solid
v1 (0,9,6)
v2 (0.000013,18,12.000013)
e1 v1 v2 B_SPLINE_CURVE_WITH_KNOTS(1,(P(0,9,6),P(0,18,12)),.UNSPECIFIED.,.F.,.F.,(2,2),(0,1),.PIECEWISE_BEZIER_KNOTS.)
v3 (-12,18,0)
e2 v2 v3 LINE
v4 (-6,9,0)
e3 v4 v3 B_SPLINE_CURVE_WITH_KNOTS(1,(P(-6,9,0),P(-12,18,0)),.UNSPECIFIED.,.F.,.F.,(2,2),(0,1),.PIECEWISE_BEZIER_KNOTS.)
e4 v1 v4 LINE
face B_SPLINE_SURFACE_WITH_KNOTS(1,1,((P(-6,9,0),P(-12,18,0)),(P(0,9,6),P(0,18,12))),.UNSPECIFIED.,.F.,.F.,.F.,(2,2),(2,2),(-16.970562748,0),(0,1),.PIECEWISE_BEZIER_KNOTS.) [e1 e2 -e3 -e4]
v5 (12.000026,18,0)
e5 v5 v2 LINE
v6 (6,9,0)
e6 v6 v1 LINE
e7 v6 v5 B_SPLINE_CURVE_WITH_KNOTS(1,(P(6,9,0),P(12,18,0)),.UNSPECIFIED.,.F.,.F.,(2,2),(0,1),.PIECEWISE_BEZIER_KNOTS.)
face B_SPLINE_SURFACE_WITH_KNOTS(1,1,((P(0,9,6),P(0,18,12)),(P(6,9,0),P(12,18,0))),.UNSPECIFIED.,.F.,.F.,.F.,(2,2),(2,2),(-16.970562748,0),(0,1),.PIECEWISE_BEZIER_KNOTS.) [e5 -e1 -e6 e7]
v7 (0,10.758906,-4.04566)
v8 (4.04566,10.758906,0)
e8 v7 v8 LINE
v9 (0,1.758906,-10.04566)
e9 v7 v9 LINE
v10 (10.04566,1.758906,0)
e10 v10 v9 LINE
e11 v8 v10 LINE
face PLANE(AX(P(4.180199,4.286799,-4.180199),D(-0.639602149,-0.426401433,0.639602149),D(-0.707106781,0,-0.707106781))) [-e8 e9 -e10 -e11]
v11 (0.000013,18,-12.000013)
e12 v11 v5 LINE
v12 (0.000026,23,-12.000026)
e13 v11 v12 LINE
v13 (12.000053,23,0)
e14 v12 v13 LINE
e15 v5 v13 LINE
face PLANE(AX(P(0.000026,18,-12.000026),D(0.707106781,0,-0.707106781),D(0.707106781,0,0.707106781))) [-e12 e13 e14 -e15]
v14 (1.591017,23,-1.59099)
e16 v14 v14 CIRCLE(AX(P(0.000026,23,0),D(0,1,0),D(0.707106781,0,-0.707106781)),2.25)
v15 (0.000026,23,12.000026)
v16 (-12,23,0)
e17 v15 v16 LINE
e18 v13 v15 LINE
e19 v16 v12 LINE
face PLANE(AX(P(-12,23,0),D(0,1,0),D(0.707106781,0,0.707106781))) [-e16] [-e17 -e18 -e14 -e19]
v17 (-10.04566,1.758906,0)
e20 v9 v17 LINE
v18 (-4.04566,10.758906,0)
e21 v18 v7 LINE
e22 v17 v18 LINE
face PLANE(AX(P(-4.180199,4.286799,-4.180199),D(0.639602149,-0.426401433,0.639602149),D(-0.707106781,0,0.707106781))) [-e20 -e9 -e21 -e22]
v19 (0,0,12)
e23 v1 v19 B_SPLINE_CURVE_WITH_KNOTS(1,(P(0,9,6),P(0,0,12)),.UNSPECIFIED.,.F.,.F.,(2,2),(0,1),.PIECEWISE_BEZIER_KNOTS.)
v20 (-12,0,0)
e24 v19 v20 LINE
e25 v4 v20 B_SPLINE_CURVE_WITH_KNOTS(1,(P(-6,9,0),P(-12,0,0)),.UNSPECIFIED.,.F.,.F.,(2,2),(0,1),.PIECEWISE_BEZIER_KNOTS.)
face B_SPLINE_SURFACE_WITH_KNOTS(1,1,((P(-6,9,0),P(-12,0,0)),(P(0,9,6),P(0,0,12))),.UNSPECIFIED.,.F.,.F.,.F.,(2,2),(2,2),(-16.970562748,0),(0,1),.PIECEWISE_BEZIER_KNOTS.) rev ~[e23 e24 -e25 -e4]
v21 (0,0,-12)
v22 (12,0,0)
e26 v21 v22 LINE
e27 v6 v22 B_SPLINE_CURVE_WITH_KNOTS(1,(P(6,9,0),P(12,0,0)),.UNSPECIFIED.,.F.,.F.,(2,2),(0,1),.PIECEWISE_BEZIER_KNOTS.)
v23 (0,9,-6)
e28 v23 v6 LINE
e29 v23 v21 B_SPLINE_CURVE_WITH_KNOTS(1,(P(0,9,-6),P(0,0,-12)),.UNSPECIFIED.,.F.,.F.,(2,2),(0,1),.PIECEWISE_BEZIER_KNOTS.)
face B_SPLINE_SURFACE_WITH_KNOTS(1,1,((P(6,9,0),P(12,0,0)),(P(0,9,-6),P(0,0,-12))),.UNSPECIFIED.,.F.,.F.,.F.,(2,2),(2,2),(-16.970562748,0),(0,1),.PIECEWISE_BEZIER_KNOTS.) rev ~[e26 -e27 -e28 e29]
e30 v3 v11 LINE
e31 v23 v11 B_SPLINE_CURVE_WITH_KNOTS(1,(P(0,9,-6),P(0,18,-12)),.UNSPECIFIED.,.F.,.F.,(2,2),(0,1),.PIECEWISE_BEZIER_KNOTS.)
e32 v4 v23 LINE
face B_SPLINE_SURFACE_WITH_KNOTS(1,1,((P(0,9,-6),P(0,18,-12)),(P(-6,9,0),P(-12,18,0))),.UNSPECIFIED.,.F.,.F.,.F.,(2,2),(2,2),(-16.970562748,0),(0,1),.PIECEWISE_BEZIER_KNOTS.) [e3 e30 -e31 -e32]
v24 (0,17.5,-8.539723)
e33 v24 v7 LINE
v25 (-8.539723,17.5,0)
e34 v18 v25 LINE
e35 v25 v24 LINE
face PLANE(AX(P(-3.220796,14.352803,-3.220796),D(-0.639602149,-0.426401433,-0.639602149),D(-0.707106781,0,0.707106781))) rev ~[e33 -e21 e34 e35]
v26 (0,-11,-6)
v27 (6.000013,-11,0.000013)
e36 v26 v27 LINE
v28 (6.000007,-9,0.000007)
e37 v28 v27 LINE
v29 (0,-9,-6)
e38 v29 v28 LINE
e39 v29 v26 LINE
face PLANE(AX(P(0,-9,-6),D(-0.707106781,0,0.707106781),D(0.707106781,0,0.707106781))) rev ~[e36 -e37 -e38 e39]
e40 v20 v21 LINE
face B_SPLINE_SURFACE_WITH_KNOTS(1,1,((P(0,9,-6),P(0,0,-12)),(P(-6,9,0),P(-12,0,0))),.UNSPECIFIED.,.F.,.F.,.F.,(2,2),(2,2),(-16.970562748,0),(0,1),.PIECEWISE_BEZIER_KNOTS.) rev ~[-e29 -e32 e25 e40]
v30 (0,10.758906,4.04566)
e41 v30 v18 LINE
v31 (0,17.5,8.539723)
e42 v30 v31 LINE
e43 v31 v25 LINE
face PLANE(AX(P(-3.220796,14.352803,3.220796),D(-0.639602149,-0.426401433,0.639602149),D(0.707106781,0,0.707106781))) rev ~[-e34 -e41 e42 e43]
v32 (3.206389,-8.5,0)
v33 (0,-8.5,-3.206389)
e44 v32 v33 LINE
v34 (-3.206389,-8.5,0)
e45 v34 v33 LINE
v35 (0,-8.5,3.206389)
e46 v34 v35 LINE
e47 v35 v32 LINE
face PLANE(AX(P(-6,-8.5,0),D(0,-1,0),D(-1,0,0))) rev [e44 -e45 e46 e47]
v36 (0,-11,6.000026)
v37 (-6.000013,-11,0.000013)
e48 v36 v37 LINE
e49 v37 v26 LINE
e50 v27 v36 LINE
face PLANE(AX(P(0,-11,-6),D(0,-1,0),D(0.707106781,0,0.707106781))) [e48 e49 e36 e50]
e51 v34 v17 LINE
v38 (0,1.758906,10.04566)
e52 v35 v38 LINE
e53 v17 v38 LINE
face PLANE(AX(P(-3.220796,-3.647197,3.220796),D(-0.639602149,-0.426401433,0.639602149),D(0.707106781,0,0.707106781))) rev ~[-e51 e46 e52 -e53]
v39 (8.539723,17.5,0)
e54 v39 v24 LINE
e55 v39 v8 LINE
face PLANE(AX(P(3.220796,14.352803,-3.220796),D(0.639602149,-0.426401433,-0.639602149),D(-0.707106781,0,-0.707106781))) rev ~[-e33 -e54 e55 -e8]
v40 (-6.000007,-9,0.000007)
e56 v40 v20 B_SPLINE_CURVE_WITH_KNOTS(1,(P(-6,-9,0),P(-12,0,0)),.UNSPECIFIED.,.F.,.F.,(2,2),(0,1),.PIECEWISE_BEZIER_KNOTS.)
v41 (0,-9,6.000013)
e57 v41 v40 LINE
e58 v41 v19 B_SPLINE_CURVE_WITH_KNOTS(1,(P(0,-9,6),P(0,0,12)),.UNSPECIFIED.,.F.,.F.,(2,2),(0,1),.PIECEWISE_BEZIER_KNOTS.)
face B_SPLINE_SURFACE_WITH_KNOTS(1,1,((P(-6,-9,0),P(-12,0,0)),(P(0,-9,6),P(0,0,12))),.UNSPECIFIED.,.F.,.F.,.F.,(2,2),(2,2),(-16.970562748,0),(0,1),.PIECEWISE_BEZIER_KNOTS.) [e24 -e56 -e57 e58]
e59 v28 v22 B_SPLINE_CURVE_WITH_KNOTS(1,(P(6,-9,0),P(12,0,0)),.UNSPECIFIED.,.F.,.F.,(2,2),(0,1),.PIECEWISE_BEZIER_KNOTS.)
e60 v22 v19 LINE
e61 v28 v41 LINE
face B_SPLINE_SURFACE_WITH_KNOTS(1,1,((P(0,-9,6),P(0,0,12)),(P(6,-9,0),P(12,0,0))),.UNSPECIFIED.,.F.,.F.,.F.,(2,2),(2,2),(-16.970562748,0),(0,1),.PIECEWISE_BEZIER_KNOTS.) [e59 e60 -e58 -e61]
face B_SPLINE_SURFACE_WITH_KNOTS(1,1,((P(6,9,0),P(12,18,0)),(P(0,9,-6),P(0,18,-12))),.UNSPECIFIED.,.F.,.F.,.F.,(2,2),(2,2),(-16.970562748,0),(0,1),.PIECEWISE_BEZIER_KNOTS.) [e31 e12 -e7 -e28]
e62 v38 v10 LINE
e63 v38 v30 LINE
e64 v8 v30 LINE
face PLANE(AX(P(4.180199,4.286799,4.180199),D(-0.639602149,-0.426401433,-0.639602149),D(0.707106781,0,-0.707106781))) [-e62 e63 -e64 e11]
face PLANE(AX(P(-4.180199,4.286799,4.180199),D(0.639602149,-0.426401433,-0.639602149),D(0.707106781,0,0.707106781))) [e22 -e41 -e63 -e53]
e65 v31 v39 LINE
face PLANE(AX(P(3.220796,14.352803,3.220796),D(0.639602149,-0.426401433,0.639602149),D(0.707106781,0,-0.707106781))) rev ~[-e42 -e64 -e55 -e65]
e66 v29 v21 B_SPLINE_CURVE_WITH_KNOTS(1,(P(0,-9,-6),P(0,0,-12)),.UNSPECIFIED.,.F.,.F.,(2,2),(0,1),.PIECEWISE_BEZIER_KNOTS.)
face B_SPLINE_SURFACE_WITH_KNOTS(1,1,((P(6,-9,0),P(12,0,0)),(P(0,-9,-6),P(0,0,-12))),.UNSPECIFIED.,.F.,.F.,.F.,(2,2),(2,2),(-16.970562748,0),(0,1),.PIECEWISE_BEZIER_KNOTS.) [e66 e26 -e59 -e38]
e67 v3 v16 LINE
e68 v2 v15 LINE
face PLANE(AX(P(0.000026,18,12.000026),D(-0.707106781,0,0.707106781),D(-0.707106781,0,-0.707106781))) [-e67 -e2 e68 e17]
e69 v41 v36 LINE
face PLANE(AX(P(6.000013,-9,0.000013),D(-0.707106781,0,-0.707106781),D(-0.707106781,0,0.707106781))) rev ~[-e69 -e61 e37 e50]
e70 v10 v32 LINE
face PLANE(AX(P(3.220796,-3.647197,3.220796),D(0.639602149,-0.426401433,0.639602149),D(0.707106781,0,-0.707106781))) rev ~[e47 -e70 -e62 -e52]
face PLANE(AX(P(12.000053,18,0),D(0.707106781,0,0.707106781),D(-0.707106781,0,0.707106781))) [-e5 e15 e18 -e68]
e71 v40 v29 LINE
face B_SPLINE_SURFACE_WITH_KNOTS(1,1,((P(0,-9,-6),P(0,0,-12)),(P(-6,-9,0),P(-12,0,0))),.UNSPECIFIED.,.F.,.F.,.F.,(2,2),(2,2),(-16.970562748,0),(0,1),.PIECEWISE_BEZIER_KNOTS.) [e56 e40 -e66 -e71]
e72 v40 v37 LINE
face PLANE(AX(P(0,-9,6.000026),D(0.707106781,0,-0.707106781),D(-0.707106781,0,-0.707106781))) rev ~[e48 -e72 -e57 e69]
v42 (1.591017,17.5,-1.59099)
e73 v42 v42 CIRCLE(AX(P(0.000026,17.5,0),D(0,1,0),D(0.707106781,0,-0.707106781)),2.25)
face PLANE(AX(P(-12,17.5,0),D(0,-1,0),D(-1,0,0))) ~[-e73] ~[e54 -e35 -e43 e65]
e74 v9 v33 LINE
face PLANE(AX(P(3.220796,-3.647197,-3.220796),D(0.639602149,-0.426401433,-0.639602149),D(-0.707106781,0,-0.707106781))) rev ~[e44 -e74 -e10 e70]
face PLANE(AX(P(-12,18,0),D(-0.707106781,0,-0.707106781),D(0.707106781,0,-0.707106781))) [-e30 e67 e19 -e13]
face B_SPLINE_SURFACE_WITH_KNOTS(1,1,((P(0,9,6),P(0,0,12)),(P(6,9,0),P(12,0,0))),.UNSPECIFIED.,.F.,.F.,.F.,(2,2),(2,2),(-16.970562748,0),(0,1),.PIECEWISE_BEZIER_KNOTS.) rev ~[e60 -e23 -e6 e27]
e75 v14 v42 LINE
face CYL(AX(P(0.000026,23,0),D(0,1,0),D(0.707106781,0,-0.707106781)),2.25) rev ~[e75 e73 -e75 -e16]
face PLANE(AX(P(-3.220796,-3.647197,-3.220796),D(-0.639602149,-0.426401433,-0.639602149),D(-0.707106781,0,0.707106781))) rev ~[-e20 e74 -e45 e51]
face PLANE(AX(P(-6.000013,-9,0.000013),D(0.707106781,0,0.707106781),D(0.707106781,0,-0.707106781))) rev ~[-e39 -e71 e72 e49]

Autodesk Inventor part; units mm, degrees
ref_plane "YZ Plane" through (0, 0, 0) normal (1, 0, 0) x (0, 1, 0)
ref_plane "XY Plane" through (0, 0, 0) normal (0, 0, 1) x (1, 0, 0)
sketch "스케치1" plane through (0, 0, 0) normal (0, 1, 0) x (-1, 0, 0)
  line L0 (12, 0) -> (0, -12)
  line L1 (0, -12) -> (-12, 0)
  line L2 (-12, 0) -> (0, 12)
  line L3 (0, 12) -> (12, 0)
  circle A0 centre (0, 0) radius 12 construction
  dimension "d0" = 24
ref_plane "작업 평면1" through (0, 9, 0) normal (0, 1, 0) x (-1, 0, 0)
sketch "스케치2" plane through (0, 9, 0) normal (0, 1, 0) x (-1, 0, 0)
  line L0 (6, 0) -> (0, -6)
  line L1 (0, -6) -> (-6, 0)
  line L2 (-6, 0) -> (0, 6)
  line L3 (0, 6) -> (6, 0)
  circle A0 centre (0, 0) radius 6 construction
  dimension "d2" = 12
loft "로프트1" add profiles "스케치2", "스케치1"
ref_plane "작업 평면2" through (0, 0, 0) normal (0, 1, 0) x (-1, 0, 0)
mirror "미러1" about plane through (0, 9, 0) normal (0, 1, 0) of "로프트1"
mirror "미러2" about plane through (0, 0, 0) normal (0, 1, 0) of "로프트1"
shell "쉘1" thickness 0.5 removed faces 0 ; own thickness 2 on faces at (-5.5, -1.5, -5.5) (5.5, -1.5, 5.5) (-5.5, -1.5, 5.5) (5.5, -1.5, -5.5) (-5.5, 16.5, -5.5) (5.5, 16.5, -5.5) (5.5, 16.5, 5.5) (-5.5, 16.5, 5.5)
sketch "스케치3" plane through (0, -9, -6) normal (0, -1, 0) x (0.7071068, 0, 0.7071068)
  line L0 (0, 8.4853) -> (0, 0) projected
  line L1 (0, 0) -> (8.4853, 0) projected
  line L2 (8.4853, 0) -> (8.4853, 8.4853) projected
  line L3 (8.4853, 8.4853) -> (0, 8.4853) projected
  point P0 (4.2426, 4.2426)
extrude "돌출1" add sketch "스케치3" along normal blind 2
sketch "스케치4" plane through (-12, 18, 0) normal (0, 1, 0) x (0.7071068, 0, 0.7071068)
  line L0 (0, 0) -> (0, 16.9706) projected
  line L1 (16.9706, 0) -> (0, 0) projected
  line L2 (16.9706, 16.9706) -> (16.9706, 0) projected
  line L3 (0, 16.9706) -> (16.9706, 16.9706) projected
  point P0 (8.4853, 8.4853)
extrude "돌출2" add sketch "스케치4" along normal blind 5
sketch "스케치5" plane through (-12, 23, 0) normal (0, 1, 0) x (0.7071068, 0, -0.7071068)
  circle A0 centre (8.4853, -8.4853) radius 2.25
  dimension "d14" = 4.5
extrude "돌출3" cut sketch "스케치5" against normal blind 5.5
properties part number "n_4"
